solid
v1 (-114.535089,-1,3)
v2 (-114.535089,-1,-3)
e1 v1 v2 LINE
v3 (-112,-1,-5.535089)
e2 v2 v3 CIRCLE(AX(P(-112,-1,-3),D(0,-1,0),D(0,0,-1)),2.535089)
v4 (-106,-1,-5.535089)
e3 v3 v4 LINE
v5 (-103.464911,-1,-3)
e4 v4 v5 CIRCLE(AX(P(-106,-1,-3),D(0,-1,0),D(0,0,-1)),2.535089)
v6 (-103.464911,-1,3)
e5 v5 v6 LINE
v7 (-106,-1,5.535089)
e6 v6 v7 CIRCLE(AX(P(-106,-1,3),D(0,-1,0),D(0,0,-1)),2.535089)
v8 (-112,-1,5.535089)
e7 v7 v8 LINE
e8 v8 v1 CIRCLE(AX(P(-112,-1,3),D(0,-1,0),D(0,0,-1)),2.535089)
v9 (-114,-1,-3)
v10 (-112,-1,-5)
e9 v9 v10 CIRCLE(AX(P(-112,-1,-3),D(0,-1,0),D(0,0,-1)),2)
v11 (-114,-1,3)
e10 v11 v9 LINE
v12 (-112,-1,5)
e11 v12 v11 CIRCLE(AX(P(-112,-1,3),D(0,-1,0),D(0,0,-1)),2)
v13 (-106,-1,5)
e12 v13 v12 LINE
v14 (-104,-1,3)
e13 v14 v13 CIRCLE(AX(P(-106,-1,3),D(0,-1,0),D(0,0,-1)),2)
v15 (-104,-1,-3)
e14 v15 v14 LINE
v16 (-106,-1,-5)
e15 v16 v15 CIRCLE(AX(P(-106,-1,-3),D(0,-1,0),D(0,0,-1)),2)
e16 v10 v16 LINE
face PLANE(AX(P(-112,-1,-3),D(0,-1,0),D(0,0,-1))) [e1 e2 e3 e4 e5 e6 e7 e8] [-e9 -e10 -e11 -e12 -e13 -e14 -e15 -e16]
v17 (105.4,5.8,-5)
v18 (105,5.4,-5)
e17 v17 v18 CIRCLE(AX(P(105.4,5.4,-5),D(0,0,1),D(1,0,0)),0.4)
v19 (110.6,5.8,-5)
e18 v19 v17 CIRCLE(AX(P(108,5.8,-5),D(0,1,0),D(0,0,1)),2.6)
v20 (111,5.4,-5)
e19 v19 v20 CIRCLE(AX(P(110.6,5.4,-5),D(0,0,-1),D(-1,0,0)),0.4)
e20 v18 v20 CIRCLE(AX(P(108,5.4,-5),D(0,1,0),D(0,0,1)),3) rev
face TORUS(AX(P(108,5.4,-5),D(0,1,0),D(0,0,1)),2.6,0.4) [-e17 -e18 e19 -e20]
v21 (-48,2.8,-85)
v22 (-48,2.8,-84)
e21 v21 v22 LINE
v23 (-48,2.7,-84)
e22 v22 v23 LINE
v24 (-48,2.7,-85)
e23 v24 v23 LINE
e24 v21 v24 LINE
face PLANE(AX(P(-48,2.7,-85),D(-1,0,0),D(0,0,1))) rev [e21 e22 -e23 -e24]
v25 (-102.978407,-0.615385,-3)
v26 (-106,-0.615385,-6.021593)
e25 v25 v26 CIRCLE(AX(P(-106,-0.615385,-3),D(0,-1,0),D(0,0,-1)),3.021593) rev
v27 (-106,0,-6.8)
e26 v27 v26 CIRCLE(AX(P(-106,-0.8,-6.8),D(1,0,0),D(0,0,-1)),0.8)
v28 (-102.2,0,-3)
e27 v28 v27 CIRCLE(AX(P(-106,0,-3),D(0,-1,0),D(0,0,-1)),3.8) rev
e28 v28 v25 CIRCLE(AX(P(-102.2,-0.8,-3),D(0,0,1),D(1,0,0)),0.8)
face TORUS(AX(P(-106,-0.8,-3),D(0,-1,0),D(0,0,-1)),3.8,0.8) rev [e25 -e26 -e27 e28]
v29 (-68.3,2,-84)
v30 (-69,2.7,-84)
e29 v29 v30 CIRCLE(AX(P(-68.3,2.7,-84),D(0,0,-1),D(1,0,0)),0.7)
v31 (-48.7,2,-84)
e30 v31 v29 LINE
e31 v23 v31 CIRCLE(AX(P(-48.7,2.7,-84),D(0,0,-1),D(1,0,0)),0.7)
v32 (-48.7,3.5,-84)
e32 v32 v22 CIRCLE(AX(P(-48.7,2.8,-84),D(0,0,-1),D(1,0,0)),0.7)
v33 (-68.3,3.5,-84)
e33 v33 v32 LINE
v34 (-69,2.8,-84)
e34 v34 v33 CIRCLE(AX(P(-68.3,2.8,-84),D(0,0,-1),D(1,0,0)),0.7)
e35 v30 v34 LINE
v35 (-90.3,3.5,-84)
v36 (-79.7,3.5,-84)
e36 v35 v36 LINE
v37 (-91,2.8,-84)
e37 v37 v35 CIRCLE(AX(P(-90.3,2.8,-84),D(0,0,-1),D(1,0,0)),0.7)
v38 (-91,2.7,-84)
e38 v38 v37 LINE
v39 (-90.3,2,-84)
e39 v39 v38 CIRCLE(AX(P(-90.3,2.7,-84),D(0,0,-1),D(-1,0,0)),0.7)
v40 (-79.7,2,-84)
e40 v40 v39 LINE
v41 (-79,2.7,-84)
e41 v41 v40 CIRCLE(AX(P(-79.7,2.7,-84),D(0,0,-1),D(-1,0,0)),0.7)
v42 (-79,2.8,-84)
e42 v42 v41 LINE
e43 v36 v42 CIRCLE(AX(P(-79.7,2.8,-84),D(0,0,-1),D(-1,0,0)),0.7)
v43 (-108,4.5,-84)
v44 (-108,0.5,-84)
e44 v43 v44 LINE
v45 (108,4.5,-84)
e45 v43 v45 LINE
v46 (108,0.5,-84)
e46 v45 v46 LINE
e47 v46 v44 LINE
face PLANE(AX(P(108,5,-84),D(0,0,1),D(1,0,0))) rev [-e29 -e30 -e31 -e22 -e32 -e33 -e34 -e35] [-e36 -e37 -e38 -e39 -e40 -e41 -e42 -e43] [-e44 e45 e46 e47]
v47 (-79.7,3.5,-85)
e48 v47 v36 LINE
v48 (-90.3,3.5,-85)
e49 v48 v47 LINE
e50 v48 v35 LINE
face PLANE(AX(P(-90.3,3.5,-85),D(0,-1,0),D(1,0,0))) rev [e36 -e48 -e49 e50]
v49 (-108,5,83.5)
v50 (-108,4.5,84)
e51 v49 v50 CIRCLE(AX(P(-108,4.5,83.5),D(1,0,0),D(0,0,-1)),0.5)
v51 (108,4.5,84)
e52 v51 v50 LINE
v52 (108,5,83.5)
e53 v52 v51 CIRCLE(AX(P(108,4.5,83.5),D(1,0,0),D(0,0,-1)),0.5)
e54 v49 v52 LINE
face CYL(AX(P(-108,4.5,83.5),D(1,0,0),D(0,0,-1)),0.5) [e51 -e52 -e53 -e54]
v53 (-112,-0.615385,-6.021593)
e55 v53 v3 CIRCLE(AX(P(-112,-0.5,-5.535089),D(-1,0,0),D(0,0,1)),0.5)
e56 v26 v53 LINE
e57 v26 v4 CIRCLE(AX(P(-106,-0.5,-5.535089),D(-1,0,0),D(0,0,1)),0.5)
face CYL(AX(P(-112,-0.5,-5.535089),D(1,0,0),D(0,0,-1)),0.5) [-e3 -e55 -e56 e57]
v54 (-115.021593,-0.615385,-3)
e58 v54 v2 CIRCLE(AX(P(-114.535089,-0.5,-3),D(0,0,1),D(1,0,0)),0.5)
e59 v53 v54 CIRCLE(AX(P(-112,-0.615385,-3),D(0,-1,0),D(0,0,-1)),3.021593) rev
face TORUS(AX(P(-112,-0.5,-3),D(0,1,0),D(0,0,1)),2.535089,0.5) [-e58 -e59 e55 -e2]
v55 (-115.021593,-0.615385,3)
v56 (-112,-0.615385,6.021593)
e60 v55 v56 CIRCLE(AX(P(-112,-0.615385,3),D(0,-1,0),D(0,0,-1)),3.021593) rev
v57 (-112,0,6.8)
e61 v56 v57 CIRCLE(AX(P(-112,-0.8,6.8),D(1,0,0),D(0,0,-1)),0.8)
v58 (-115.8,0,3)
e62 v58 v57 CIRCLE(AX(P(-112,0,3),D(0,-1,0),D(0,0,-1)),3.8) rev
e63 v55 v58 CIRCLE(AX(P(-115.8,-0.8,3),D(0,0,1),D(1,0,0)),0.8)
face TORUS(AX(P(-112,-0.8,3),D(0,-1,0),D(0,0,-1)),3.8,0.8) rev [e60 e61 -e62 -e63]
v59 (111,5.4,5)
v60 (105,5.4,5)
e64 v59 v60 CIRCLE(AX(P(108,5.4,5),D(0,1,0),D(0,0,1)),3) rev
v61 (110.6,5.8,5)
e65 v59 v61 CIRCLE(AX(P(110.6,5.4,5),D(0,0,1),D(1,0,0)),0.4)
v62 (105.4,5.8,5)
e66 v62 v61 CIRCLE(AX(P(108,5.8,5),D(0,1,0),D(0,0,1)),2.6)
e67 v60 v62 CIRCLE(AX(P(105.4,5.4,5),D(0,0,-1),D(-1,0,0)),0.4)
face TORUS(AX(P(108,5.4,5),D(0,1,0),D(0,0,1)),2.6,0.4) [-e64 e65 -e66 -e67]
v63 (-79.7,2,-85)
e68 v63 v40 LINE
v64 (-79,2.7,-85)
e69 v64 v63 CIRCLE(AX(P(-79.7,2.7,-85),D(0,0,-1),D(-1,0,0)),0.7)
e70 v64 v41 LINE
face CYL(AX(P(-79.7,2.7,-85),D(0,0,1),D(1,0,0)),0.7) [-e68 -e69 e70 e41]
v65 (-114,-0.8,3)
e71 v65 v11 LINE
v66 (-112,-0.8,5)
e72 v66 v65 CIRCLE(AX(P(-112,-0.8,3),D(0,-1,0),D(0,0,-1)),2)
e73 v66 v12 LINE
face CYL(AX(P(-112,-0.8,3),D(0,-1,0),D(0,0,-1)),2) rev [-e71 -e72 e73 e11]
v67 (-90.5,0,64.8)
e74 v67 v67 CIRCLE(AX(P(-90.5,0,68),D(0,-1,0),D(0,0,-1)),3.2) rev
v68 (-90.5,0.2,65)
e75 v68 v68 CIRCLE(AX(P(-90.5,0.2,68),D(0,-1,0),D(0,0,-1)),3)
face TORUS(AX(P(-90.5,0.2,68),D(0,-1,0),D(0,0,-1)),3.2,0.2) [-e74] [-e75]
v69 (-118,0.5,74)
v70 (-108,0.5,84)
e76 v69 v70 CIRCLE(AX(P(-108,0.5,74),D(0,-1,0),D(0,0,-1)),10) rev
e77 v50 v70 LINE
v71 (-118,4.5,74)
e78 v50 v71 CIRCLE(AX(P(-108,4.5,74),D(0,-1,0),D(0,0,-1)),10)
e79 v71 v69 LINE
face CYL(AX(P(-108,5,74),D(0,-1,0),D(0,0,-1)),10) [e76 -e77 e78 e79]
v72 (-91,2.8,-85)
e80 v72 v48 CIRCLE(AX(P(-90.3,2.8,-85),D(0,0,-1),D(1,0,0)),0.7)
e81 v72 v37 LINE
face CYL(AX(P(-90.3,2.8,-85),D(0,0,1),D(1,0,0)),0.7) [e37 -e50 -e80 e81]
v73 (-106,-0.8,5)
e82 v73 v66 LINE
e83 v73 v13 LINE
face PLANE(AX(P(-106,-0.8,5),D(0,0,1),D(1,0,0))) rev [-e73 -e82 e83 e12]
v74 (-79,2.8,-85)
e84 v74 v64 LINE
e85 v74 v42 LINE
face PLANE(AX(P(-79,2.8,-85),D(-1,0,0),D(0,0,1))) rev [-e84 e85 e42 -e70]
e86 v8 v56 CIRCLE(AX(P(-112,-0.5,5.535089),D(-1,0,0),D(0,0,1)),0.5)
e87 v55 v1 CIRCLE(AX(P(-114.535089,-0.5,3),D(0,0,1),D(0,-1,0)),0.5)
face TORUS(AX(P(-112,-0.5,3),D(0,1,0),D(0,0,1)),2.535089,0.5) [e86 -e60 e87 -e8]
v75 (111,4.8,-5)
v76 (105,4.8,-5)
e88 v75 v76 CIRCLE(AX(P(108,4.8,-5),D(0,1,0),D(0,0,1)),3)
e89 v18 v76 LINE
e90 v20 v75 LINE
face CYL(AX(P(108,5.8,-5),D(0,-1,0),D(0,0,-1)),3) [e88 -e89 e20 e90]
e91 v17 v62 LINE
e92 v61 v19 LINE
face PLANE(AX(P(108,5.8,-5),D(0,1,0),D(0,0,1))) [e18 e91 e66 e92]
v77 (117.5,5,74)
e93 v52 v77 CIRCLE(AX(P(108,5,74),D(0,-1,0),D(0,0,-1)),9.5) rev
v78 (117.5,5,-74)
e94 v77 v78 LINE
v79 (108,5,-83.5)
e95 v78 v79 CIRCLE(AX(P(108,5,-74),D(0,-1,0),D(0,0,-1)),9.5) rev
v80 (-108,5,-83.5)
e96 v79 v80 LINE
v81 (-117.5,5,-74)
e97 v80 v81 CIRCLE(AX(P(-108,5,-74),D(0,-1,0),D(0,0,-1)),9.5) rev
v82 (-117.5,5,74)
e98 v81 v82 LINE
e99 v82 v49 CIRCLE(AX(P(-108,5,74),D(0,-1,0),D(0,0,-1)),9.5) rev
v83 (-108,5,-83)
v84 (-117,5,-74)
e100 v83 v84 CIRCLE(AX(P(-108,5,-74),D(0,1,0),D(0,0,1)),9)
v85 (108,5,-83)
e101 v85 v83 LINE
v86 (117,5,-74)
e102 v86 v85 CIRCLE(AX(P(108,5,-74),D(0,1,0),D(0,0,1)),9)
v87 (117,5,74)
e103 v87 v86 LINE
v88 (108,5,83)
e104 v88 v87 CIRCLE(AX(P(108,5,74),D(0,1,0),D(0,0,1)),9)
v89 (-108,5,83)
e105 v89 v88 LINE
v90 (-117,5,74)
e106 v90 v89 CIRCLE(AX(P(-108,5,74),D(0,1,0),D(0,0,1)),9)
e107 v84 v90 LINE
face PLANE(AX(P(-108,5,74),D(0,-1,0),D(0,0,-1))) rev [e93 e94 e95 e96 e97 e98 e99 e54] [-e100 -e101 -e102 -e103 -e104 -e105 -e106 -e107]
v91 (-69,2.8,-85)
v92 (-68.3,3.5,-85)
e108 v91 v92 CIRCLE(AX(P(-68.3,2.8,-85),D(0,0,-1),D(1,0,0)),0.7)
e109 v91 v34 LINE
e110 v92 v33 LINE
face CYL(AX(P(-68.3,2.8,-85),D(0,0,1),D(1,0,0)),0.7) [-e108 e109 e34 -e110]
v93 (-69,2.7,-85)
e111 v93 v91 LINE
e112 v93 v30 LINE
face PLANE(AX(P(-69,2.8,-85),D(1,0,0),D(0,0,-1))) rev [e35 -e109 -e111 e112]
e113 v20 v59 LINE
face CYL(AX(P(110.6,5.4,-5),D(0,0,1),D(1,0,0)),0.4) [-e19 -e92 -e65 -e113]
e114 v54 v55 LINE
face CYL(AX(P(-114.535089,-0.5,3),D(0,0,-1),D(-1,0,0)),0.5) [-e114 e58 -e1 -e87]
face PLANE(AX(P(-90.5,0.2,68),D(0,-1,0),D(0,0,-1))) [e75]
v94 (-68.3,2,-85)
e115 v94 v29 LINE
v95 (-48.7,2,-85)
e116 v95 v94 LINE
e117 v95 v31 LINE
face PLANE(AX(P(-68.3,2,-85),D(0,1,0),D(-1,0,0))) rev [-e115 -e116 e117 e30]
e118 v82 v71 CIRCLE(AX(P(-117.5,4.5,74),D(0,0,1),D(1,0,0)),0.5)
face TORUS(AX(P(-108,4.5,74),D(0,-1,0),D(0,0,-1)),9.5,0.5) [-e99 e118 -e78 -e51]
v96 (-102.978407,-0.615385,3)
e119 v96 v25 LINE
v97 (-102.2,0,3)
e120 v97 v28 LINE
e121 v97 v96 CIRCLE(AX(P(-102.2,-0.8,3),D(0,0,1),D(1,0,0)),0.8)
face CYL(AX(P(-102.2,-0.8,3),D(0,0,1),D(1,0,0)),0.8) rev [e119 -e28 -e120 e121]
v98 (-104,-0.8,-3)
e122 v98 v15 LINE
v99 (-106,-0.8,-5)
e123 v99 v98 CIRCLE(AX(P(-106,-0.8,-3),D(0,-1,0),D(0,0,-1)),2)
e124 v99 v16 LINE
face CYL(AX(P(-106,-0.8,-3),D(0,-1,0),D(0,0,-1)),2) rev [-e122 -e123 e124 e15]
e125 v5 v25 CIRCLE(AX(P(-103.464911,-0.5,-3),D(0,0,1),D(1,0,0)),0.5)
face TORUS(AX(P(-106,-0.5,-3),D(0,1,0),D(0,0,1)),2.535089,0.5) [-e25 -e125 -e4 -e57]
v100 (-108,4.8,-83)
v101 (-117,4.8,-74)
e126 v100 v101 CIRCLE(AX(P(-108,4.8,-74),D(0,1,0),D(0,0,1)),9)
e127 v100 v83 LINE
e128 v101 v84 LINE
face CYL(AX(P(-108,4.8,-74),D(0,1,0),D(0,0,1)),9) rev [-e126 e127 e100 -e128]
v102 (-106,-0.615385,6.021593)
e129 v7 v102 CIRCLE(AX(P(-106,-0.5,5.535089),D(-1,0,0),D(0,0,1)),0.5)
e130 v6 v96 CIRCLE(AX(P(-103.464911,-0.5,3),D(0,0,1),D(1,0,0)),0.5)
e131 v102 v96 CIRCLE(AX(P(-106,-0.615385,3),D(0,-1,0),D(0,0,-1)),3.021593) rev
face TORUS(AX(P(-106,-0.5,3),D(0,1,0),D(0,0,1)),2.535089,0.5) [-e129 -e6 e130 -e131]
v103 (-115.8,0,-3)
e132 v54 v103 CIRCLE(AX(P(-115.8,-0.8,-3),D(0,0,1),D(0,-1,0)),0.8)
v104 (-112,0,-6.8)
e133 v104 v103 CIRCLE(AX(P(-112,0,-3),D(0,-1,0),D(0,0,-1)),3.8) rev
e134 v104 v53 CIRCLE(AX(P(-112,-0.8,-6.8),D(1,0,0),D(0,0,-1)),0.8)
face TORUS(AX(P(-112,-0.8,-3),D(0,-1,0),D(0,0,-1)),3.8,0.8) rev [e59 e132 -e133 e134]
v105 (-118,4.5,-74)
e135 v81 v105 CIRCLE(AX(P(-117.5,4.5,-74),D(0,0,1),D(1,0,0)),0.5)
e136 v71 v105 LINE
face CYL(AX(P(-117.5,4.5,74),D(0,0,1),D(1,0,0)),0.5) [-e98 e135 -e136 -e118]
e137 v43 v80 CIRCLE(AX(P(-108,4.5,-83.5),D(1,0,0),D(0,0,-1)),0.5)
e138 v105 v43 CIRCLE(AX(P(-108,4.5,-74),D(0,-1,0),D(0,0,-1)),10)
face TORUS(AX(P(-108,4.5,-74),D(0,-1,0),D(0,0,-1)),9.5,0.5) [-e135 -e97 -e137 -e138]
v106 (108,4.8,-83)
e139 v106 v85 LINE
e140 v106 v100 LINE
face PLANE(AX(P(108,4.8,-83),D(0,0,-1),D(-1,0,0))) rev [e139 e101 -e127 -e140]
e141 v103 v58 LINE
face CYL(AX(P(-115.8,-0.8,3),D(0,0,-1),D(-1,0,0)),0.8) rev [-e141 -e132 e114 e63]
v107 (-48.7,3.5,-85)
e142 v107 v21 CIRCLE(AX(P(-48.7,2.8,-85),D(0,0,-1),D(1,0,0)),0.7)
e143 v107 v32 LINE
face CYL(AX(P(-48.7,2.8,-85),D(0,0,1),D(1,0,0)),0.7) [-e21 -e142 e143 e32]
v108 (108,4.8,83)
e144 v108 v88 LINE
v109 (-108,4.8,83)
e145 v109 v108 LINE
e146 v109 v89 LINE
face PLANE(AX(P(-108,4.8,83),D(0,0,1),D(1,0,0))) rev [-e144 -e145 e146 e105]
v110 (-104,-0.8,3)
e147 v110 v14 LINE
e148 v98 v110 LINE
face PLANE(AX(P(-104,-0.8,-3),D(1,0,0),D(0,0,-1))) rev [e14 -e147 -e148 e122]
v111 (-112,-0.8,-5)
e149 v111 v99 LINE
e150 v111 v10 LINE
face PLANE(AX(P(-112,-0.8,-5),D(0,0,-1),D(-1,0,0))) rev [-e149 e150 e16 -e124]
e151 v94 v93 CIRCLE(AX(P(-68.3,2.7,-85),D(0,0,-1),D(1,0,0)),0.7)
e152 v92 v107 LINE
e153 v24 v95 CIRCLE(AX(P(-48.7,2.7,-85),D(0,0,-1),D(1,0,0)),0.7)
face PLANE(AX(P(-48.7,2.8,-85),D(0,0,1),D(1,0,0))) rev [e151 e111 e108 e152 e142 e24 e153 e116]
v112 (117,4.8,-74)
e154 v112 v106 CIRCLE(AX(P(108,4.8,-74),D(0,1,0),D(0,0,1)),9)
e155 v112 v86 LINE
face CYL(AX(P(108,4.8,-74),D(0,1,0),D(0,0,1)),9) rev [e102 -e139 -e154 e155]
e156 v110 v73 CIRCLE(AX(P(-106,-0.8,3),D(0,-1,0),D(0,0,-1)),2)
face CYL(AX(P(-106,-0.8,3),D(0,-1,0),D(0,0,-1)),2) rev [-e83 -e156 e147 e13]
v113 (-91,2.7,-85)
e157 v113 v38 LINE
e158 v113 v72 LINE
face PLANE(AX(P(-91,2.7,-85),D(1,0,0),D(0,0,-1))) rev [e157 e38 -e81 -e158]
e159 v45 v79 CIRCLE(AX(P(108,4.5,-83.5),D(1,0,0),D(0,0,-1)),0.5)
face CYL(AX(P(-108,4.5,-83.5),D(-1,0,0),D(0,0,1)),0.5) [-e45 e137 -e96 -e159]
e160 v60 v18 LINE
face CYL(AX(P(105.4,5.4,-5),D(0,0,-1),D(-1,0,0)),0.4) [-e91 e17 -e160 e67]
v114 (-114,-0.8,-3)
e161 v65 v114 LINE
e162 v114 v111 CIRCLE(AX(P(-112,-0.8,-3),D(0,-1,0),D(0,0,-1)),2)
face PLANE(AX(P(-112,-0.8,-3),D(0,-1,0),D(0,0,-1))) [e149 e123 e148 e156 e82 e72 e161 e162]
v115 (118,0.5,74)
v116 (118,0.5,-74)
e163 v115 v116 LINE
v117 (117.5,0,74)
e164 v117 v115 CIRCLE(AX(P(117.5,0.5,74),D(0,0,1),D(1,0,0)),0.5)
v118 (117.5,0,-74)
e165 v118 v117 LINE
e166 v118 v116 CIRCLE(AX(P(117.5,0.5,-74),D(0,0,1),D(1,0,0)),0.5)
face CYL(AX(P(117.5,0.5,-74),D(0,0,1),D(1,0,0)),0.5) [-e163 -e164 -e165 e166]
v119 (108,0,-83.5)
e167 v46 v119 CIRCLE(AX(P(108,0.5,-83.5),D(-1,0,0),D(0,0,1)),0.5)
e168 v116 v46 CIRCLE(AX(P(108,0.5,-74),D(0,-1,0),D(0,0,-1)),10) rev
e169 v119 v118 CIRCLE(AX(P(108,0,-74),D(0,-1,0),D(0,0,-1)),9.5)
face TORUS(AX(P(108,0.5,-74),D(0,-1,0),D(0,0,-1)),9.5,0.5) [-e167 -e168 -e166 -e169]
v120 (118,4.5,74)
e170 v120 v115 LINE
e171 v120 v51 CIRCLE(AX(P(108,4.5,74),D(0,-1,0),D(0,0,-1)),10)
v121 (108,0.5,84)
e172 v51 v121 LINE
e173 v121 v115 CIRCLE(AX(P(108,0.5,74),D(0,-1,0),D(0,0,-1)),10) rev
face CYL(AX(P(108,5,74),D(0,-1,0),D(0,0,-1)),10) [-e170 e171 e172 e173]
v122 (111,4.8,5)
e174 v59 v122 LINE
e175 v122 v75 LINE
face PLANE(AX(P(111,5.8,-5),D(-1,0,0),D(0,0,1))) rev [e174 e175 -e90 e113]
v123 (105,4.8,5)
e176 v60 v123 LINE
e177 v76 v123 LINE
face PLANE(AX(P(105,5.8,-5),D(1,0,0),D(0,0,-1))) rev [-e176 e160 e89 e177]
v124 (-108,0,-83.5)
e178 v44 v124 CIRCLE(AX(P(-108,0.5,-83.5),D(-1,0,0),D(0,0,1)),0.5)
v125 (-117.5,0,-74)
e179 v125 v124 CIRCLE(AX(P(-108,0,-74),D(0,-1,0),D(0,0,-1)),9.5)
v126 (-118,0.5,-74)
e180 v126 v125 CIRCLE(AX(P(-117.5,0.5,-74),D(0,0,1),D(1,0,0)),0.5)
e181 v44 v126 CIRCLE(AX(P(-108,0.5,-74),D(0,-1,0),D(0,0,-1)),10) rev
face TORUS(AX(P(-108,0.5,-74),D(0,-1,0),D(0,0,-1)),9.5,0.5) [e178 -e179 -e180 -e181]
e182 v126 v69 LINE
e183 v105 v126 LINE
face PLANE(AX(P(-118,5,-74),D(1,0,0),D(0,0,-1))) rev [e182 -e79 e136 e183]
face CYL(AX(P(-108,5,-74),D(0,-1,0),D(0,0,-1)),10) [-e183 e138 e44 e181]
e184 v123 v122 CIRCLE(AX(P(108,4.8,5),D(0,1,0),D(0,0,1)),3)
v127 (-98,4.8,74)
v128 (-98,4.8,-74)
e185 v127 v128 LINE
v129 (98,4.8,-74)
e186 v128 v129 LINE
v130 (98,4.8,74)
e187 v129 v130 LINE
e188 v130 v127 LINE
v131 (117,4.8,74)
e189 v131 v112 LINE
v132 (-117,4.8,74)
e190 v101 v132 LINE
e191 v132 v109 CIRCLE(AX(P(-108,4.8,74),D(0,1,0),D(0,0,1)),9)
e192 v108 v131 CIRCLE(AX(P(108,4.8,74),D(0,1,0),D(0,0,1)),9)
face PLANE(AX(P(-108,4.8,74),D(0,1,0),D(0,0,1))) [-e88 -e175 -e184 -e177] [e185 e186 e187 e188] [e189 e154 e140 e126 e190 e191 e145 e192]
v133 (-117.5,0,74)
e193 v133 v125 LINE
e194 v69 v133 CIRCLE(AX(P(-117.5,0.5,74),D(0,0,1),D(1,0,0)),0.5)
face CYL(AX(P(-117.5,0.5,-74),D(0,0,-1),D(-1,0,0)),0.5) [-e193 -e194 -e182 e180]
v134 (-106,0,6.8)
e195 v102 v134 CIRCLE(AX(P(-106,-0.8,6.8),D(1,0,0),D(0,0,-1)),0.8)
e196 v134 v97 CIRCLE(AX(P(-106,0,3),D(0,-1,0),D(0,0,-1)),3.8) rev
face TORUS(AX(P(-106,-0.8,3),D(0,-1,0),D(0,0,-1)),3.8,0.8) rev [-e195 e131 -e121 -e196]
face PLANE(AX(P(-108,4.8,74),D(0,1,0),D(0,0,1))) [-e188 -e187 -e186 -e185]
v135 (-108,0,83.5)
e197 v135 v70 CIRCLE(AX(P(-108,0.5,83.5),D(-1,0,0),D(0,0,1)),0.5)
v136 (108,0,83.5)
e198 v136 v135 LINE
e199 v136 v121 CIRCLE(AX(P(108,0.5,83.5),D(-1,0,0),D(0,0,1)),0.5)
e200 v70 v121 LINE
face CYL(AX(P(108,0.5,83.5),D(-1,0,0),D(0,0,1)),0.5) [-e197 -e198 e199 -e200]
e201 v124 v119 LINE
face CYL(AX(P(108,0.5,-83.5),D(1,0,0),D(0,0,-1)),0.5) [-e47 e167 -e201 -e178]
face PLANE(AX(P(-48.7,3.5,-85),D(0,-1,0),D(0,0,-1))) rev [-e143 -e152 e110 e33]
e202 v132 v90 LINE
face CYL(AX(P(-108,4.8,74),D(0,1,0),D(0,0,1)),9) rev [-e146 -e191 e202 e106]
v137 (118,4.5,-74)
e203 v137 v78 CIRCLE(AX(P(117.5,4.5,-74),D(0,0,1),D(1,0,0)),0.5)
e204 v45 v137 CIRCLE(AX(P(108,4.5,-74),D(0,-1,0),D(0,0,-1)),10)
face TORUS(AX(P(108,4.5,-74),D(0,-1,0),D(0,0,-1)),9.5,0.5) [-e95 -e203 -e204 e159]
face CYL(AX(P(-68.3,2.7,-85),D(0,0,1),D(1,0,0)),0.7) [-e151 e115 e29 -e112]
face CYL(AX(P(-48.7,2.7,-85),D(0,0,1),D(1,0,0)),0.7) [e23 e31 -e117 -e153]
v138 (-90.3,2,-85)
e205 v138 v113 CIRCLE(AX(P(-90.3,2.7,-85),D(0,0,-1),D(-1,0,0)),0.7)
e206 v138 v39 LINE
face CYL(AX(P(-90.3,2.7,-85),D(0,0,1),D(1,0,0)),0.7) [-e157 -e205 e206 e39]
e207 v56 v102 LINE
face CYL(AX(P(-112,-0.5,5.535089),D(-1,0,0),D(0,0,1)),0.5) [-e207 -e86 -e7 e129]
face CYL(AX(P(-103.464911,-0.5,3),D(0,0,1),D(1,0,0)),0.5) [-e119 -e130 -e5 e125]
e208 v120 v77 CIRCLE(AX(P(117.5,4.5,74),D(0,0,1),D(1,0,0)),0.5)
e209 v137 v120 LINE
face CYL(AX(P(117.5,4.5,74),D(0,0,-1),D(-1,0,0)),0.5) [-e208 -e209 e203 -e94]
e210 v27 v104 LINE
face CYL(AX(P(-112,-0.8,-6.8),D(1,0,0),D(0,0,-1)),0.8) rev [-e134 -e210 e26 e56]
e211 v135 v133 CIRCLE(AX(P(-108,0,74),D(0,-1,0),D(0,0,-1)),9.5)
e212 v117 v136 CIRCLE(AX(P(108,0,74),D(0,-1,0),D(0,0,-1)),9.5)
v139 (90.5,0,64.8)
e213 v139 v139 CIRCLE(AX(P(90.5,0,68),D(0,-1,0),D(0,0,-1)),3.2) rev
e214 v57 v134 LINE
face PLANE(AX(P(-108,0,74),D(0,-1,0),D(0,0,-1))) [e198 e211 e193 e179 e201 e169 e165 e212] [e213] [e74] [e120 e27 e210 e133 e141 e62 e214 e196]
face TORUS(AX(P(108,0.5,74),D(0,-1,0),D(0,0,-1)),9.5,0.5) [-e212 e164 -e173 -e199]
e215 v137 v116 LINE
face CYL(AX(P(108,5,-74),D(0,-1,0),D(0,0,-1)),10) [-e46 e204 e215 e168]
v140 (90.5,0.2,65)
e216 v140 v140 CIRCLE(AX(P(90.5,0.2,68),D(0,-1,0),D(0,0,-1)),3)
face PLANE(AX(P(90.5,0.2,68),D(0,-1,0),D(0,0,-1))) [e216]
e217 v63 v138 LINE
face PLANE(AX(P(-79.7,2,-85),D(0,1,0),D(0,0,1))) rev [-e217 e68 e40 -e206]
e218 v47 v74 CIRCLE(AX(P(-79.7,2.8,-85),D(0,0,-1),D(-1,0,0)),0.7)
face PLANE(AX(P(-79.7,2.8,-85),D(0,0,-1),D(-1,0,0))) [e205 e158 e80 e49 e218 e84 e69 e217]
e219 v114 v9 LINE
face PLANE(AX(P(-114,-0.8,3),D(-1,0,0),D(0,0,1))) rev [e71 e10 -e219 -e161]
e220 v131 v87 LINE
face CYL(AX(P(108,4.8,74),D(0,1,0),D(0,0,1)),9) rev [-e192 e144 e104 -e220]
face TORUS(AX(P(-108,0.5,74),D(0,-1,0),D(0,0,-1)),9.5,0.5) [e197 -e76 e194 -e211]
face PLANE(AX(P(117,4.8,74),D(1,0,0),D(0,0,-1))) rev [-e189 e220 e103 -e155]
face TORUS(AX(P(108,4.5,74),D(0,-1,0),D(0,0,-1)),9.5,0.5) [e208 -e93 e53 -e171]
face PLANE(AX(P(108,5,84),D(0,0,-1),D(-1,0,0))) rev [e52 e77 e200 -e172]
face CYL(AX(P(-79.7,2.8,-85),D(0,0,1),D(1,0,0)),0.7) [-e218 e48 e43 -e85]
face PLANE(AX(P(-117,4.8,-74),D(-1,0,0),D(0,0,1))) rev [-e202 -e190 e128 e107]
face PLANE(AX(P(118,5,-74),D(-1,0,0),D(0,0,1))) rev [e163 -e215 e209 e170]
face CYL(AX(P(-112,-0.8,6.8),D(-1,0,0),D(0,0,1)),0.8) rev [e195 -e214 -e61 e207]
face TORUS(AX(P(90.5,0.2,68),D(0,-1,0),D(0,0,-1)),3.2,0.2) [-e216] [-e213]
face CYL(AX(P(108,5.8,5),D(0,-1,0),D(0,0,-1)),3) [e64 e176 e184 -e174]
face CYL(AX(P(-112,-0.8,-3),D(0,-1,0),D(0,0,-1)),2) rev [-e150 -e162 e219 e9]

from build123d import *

# Parameters (mm, degrees)
BOSS_EXTRUDE1_DEPTH = 5
CUT_EXTRUDE1_DEPTH  = 0.2
BOSS_EXTRUDE2_DEPTH = 1
FILLET1_R           = 0.4
BOSS_EXTRUDE3_DEPTH = 1
CUT_EXTRUDE2_DEPTH  = 0.2
FILLET2_R           = 0.8
SKETCH9_R           = 3
CUT_EXTRUDE3_DEPTH  = 0.2
FILLET3_R           = 0.5
BOSS_EXTRUDE4_DEPTH = 1
FILLET4_R           = 0.5
FILLET5_R           = 0.5
FILLET7_R           = 0.2


with BuildPart() as part:
    # Sketch1 → Boss-Extrude1 (new body)
    with BuildSketch(Plane(origin=(0, 0, 0), x_dir=(1, 0, 0), z_dir=(0, 1, 0))):
        with BuildLine():
            Line((108, 84), (-108, 84))
            ThreePointArc((-108, 84), (-115.071067812, 81.071067812), (-118, 74))
            Line((-118, 74), (-118, -74))
            ThreePointArc((-118, -74), (-115.071067812, -81.071067812), (-108, -84))
            Line((-108, -84), (108, -84))
            ThreePointArc((108, -84), (115.071067812, -81.071067812), (118, -74))
            Line((118, -74), (118, 74))
            ThreePointArc((118, 74), (115.071067812, 81.071067812), (108, 84))
        make_face()
    extrude(amount=BOSS_EXTRUDE1_DEPTH)

    # Sketch2 → Cut-Extrude1 (cut)
    with BuildSketch(Plane(origin=(0, 5, 0), x_dir=(1, 0, 0), z_dir=(0, 1, 0))):
        with BuildLine():
            Line((-108, -83), (108, -83))
            ThreePointArc((108, -83), (114.363961031, -80.363961031), (117, -74))
            Line((117, -74), (117, 74))
            ThreePointArc((117, 74), (114.363961031, 80.363961031), (108, 83))
            Line((108, 83), (-108, 83))
            ThreePointArc((-108, 83), (-114.363961031, 80.363961031), (-117, 74))
            Line((-117, 74), (-117, -74))
            ThreePointArc((-117, -74), (-114.363961031, -80.363961031), (-108, -83))
        make_face()
    extrude(amount=-CUT_EXTRUDE1_DEPTH, mode=Mode.SUBTRACT)

    # Sketch6 → Boss-Extrude2 (add)
    with BuildSketch(Plane(origin=(0, 4.8, 0), x_dir=(1, 0, 0), z_dir=(0, 1, 0))):
        with BuildLine():
            Line((111, 5), (111, -5))
            ThreePointArc((111, -5), (108, -8), (105, -5))
            Line((105, -5), (105, 5))
            ThreePointArc((105, 5), (108, 8), (111, 5))
        make_face()
    extrude(amount=BOSS_EXTRUDE2_DEPTH)

    # Fillet1
    fillet1_edges = [part.edges().sort_by_distance(p)[0] for p in [
        (108, 5.8, -8),
        (105, 5.8, 0),
        (108, 5.8, 8),
        (111, 5.8, 0),
    ]]
    fillet(fillet1_edges, radius=FILLET1_R)

    # Sketch7 → Boss-Extrude3 (add)
    with BuildSketch(Plane.XZ):
        with BuildLine():
            Line((-112, 6), (-106, 6))
            ThreePointArc((-106, 6), (-103.878679656, 5.121320344), (-103, 3))
            Line((-103, 3), (-103, -3))
            ThreePointArc((-103, -3), (-103.878679656, -5.121320344), (-106, -6))
            Line((-106, -6), (-112, -6))
            ThreePointArc((-112, -6), (-114.121320344, -5.121320344), (-115, -3))
            Line((-115, -3), (-115, 3))
            ThreePointArc((-115, 3), (-114.121320344, 5.121320344), (-112, 6))
        make_face()
    extrude(amount=BOSS_EXTRUDE3_DEPTH)

    # Sketch8 → Cut-Extrude2 (cut)
    with BuildSketch(Plane.XZ.offset(1)):
        with BuildLine():
            Line((-112, -5), (-106, -5))
            ThreePointArc((-106, -5), (-104.585786438, -4.414213562), (-104, -3))
            Line((-104, -3), (-104, 3))
            ThreePointArc((-104, 3), (-104.585786438, 4.414213562), (-106, 5))
            Line((-106, 5), (-112, 5))
            ThreePointArc((-112, 5), (-113.414213562, 4.414213562), (-114, 3))
            Line((-114, 3), (-114, -3))
            ThreePointArc((-114, -3), (-113.414213562, -4.414213562), (-112, -5))
        make_face()
    extrude(amount=-CUT_EXTRUDE2_DEPTH, mode=Mode.SUBTRACT)

    # Fillet2
    fillet2_edges = [part.edges().sort_by_distance(p)[0] for p in [
        (-114.121320344, 0, -5.121320344),
        (-109, 0, -6),
        (-103.878679656, 0, -5.121320344),
        (-103, 0, 0),
        (-103.878679656, 0, 5.121320344),
        (-109, 0, 6),
        (-114.121320344, 0, 5.121320344),
        (-115, 0, 0),
    ]]
    fillet(fillet2_edges, radius=FILLET2_R)

    # Sketch9 → Cut-Extrude3 (cut)
    with BuildSketch(Plane.XZ):
        with Locations(Location((-90.5, 68, 0), (0, 0, 270))):
            Circle(SKETCH9_R)
        with Locations(Location((90.5, 68, 0), (0, 0, 270))):
            Circle(SKETCH9_R)
    extrude(amount=-CUT_EXTRUDE3_DEPTH, mode=Mode.SUBTRACT)

    # Fillet3
    fillet3_edges = [part.edges().sort_by_distance(p)[0] for p in [
        (118, 0, 0),
        (115.071067812, 0, 81.071067812),
        (0, 0, 84),
        (-115.071067812, 0, 81.071067812),
        (-118, 0, 0),
        (-115.071067812, 0, -81.071067812),
        (0, 0, -84),
        (115.071067812, 0, -81.071067812),
    ]]
    fillet(fillet3_edges, radius=FILLET3_R)

    # Sketch10 → Boss-Extrude4 (add)
    with BuildSketch(Plane(origin=(0, 0, -84), x_dir=(-1, 0, 0), z_dir=(0, 0, -1))):
        with BuildLine():
            Line((48, 2.7), (48, 2.8))
            ThreePointArc((48, 2.8), (48.205025253, 3.294974747), (48.7, 3.5))
            Line((48.7, 3.5), (68.3, 3.5))
            ThreePointArc((68.3, 3.5), (68.794974747, 3.294974747), (69, 2.8))
            Line((69, 2.8), (69, 2.7))
            ThreePointArc((69, 2.7), (68.794974747, 2.205025253), (68.3, 2))
            Line((68.3, 2), (48.7, 2))
            ThreePointArc((48.7, 2), (48.205025253, 2.205025253), (48, 2.7))
        make_face()
        with BuildLine():
            Line((91, 2.7), (91, 2.8))
            ThreePointArc((91, 2.8), (90.794974747, 3.294974747), (90.3, 3.5))
            Line((90.3, 3.5), (79.7, 3.5))
            ThreePointArc((79.7, 3.5), (79.205025253, 3.294974747), (79, 2.8))
            Line((79, 2.8), (79, 2.7))
            ThreePointArc((79, 2.7), (79.205025253, 2.205025253), (79.7, 2))
            Line((79.7, 2), (90.3, 2))
            ThreePointArc((90.3, 2), (90.794974747, 2.205025253), (91, 2.7))
        make_face()
    extrude(amount=BOSS_EXTRUDE4_DEPTH)

    # Fillet4
    fillet4_edges = [part.edges().sort_by_distance(p)[0] for p in [
        (115.071067812, 5, 81.071067812),
        (118, 5, 0),
        (115.071067812, 5, -81.071067812),
        (0, 5, -84),
        (-115.071067812, 5, -81.071067812),
        (-118, 5, 0),
        (-115.071067812, 5, 81.071067812),
        (0, 5, 84),
    ]]
    fillet(fillet4_edges, radius=FILLET4_R)

    # Fillet5
    fillet5_edges = [part.edges().sort_by_distance(p)[0] for p in [
        (-114.121320344, -1, 5.121320344),
        (-109, -1, 6),
        (-103.878679656, -1, 5.121320344),
        (-103, -1, 0),
        (-103.878679656, -1, -5.121320344),
        (-109, -1, -6),
        (-114.121320344, -1, -5.121320344),
        (-115, -1, 0),
    ]]
    fillet(fillet5_edges, radius=FILLET5_R)

    # Fillet7
    fillet7_edges = [part.edges().sort_by_distance(p)[0] for p in [
        (-90.5, 0, 71),
        (90.5, 0, 71),
    ]]
    fillet(fillet7_edges, radius=FILLET7_R - 0.0001)  # a hair under: the kernel refuses the full size


solid = part.part
